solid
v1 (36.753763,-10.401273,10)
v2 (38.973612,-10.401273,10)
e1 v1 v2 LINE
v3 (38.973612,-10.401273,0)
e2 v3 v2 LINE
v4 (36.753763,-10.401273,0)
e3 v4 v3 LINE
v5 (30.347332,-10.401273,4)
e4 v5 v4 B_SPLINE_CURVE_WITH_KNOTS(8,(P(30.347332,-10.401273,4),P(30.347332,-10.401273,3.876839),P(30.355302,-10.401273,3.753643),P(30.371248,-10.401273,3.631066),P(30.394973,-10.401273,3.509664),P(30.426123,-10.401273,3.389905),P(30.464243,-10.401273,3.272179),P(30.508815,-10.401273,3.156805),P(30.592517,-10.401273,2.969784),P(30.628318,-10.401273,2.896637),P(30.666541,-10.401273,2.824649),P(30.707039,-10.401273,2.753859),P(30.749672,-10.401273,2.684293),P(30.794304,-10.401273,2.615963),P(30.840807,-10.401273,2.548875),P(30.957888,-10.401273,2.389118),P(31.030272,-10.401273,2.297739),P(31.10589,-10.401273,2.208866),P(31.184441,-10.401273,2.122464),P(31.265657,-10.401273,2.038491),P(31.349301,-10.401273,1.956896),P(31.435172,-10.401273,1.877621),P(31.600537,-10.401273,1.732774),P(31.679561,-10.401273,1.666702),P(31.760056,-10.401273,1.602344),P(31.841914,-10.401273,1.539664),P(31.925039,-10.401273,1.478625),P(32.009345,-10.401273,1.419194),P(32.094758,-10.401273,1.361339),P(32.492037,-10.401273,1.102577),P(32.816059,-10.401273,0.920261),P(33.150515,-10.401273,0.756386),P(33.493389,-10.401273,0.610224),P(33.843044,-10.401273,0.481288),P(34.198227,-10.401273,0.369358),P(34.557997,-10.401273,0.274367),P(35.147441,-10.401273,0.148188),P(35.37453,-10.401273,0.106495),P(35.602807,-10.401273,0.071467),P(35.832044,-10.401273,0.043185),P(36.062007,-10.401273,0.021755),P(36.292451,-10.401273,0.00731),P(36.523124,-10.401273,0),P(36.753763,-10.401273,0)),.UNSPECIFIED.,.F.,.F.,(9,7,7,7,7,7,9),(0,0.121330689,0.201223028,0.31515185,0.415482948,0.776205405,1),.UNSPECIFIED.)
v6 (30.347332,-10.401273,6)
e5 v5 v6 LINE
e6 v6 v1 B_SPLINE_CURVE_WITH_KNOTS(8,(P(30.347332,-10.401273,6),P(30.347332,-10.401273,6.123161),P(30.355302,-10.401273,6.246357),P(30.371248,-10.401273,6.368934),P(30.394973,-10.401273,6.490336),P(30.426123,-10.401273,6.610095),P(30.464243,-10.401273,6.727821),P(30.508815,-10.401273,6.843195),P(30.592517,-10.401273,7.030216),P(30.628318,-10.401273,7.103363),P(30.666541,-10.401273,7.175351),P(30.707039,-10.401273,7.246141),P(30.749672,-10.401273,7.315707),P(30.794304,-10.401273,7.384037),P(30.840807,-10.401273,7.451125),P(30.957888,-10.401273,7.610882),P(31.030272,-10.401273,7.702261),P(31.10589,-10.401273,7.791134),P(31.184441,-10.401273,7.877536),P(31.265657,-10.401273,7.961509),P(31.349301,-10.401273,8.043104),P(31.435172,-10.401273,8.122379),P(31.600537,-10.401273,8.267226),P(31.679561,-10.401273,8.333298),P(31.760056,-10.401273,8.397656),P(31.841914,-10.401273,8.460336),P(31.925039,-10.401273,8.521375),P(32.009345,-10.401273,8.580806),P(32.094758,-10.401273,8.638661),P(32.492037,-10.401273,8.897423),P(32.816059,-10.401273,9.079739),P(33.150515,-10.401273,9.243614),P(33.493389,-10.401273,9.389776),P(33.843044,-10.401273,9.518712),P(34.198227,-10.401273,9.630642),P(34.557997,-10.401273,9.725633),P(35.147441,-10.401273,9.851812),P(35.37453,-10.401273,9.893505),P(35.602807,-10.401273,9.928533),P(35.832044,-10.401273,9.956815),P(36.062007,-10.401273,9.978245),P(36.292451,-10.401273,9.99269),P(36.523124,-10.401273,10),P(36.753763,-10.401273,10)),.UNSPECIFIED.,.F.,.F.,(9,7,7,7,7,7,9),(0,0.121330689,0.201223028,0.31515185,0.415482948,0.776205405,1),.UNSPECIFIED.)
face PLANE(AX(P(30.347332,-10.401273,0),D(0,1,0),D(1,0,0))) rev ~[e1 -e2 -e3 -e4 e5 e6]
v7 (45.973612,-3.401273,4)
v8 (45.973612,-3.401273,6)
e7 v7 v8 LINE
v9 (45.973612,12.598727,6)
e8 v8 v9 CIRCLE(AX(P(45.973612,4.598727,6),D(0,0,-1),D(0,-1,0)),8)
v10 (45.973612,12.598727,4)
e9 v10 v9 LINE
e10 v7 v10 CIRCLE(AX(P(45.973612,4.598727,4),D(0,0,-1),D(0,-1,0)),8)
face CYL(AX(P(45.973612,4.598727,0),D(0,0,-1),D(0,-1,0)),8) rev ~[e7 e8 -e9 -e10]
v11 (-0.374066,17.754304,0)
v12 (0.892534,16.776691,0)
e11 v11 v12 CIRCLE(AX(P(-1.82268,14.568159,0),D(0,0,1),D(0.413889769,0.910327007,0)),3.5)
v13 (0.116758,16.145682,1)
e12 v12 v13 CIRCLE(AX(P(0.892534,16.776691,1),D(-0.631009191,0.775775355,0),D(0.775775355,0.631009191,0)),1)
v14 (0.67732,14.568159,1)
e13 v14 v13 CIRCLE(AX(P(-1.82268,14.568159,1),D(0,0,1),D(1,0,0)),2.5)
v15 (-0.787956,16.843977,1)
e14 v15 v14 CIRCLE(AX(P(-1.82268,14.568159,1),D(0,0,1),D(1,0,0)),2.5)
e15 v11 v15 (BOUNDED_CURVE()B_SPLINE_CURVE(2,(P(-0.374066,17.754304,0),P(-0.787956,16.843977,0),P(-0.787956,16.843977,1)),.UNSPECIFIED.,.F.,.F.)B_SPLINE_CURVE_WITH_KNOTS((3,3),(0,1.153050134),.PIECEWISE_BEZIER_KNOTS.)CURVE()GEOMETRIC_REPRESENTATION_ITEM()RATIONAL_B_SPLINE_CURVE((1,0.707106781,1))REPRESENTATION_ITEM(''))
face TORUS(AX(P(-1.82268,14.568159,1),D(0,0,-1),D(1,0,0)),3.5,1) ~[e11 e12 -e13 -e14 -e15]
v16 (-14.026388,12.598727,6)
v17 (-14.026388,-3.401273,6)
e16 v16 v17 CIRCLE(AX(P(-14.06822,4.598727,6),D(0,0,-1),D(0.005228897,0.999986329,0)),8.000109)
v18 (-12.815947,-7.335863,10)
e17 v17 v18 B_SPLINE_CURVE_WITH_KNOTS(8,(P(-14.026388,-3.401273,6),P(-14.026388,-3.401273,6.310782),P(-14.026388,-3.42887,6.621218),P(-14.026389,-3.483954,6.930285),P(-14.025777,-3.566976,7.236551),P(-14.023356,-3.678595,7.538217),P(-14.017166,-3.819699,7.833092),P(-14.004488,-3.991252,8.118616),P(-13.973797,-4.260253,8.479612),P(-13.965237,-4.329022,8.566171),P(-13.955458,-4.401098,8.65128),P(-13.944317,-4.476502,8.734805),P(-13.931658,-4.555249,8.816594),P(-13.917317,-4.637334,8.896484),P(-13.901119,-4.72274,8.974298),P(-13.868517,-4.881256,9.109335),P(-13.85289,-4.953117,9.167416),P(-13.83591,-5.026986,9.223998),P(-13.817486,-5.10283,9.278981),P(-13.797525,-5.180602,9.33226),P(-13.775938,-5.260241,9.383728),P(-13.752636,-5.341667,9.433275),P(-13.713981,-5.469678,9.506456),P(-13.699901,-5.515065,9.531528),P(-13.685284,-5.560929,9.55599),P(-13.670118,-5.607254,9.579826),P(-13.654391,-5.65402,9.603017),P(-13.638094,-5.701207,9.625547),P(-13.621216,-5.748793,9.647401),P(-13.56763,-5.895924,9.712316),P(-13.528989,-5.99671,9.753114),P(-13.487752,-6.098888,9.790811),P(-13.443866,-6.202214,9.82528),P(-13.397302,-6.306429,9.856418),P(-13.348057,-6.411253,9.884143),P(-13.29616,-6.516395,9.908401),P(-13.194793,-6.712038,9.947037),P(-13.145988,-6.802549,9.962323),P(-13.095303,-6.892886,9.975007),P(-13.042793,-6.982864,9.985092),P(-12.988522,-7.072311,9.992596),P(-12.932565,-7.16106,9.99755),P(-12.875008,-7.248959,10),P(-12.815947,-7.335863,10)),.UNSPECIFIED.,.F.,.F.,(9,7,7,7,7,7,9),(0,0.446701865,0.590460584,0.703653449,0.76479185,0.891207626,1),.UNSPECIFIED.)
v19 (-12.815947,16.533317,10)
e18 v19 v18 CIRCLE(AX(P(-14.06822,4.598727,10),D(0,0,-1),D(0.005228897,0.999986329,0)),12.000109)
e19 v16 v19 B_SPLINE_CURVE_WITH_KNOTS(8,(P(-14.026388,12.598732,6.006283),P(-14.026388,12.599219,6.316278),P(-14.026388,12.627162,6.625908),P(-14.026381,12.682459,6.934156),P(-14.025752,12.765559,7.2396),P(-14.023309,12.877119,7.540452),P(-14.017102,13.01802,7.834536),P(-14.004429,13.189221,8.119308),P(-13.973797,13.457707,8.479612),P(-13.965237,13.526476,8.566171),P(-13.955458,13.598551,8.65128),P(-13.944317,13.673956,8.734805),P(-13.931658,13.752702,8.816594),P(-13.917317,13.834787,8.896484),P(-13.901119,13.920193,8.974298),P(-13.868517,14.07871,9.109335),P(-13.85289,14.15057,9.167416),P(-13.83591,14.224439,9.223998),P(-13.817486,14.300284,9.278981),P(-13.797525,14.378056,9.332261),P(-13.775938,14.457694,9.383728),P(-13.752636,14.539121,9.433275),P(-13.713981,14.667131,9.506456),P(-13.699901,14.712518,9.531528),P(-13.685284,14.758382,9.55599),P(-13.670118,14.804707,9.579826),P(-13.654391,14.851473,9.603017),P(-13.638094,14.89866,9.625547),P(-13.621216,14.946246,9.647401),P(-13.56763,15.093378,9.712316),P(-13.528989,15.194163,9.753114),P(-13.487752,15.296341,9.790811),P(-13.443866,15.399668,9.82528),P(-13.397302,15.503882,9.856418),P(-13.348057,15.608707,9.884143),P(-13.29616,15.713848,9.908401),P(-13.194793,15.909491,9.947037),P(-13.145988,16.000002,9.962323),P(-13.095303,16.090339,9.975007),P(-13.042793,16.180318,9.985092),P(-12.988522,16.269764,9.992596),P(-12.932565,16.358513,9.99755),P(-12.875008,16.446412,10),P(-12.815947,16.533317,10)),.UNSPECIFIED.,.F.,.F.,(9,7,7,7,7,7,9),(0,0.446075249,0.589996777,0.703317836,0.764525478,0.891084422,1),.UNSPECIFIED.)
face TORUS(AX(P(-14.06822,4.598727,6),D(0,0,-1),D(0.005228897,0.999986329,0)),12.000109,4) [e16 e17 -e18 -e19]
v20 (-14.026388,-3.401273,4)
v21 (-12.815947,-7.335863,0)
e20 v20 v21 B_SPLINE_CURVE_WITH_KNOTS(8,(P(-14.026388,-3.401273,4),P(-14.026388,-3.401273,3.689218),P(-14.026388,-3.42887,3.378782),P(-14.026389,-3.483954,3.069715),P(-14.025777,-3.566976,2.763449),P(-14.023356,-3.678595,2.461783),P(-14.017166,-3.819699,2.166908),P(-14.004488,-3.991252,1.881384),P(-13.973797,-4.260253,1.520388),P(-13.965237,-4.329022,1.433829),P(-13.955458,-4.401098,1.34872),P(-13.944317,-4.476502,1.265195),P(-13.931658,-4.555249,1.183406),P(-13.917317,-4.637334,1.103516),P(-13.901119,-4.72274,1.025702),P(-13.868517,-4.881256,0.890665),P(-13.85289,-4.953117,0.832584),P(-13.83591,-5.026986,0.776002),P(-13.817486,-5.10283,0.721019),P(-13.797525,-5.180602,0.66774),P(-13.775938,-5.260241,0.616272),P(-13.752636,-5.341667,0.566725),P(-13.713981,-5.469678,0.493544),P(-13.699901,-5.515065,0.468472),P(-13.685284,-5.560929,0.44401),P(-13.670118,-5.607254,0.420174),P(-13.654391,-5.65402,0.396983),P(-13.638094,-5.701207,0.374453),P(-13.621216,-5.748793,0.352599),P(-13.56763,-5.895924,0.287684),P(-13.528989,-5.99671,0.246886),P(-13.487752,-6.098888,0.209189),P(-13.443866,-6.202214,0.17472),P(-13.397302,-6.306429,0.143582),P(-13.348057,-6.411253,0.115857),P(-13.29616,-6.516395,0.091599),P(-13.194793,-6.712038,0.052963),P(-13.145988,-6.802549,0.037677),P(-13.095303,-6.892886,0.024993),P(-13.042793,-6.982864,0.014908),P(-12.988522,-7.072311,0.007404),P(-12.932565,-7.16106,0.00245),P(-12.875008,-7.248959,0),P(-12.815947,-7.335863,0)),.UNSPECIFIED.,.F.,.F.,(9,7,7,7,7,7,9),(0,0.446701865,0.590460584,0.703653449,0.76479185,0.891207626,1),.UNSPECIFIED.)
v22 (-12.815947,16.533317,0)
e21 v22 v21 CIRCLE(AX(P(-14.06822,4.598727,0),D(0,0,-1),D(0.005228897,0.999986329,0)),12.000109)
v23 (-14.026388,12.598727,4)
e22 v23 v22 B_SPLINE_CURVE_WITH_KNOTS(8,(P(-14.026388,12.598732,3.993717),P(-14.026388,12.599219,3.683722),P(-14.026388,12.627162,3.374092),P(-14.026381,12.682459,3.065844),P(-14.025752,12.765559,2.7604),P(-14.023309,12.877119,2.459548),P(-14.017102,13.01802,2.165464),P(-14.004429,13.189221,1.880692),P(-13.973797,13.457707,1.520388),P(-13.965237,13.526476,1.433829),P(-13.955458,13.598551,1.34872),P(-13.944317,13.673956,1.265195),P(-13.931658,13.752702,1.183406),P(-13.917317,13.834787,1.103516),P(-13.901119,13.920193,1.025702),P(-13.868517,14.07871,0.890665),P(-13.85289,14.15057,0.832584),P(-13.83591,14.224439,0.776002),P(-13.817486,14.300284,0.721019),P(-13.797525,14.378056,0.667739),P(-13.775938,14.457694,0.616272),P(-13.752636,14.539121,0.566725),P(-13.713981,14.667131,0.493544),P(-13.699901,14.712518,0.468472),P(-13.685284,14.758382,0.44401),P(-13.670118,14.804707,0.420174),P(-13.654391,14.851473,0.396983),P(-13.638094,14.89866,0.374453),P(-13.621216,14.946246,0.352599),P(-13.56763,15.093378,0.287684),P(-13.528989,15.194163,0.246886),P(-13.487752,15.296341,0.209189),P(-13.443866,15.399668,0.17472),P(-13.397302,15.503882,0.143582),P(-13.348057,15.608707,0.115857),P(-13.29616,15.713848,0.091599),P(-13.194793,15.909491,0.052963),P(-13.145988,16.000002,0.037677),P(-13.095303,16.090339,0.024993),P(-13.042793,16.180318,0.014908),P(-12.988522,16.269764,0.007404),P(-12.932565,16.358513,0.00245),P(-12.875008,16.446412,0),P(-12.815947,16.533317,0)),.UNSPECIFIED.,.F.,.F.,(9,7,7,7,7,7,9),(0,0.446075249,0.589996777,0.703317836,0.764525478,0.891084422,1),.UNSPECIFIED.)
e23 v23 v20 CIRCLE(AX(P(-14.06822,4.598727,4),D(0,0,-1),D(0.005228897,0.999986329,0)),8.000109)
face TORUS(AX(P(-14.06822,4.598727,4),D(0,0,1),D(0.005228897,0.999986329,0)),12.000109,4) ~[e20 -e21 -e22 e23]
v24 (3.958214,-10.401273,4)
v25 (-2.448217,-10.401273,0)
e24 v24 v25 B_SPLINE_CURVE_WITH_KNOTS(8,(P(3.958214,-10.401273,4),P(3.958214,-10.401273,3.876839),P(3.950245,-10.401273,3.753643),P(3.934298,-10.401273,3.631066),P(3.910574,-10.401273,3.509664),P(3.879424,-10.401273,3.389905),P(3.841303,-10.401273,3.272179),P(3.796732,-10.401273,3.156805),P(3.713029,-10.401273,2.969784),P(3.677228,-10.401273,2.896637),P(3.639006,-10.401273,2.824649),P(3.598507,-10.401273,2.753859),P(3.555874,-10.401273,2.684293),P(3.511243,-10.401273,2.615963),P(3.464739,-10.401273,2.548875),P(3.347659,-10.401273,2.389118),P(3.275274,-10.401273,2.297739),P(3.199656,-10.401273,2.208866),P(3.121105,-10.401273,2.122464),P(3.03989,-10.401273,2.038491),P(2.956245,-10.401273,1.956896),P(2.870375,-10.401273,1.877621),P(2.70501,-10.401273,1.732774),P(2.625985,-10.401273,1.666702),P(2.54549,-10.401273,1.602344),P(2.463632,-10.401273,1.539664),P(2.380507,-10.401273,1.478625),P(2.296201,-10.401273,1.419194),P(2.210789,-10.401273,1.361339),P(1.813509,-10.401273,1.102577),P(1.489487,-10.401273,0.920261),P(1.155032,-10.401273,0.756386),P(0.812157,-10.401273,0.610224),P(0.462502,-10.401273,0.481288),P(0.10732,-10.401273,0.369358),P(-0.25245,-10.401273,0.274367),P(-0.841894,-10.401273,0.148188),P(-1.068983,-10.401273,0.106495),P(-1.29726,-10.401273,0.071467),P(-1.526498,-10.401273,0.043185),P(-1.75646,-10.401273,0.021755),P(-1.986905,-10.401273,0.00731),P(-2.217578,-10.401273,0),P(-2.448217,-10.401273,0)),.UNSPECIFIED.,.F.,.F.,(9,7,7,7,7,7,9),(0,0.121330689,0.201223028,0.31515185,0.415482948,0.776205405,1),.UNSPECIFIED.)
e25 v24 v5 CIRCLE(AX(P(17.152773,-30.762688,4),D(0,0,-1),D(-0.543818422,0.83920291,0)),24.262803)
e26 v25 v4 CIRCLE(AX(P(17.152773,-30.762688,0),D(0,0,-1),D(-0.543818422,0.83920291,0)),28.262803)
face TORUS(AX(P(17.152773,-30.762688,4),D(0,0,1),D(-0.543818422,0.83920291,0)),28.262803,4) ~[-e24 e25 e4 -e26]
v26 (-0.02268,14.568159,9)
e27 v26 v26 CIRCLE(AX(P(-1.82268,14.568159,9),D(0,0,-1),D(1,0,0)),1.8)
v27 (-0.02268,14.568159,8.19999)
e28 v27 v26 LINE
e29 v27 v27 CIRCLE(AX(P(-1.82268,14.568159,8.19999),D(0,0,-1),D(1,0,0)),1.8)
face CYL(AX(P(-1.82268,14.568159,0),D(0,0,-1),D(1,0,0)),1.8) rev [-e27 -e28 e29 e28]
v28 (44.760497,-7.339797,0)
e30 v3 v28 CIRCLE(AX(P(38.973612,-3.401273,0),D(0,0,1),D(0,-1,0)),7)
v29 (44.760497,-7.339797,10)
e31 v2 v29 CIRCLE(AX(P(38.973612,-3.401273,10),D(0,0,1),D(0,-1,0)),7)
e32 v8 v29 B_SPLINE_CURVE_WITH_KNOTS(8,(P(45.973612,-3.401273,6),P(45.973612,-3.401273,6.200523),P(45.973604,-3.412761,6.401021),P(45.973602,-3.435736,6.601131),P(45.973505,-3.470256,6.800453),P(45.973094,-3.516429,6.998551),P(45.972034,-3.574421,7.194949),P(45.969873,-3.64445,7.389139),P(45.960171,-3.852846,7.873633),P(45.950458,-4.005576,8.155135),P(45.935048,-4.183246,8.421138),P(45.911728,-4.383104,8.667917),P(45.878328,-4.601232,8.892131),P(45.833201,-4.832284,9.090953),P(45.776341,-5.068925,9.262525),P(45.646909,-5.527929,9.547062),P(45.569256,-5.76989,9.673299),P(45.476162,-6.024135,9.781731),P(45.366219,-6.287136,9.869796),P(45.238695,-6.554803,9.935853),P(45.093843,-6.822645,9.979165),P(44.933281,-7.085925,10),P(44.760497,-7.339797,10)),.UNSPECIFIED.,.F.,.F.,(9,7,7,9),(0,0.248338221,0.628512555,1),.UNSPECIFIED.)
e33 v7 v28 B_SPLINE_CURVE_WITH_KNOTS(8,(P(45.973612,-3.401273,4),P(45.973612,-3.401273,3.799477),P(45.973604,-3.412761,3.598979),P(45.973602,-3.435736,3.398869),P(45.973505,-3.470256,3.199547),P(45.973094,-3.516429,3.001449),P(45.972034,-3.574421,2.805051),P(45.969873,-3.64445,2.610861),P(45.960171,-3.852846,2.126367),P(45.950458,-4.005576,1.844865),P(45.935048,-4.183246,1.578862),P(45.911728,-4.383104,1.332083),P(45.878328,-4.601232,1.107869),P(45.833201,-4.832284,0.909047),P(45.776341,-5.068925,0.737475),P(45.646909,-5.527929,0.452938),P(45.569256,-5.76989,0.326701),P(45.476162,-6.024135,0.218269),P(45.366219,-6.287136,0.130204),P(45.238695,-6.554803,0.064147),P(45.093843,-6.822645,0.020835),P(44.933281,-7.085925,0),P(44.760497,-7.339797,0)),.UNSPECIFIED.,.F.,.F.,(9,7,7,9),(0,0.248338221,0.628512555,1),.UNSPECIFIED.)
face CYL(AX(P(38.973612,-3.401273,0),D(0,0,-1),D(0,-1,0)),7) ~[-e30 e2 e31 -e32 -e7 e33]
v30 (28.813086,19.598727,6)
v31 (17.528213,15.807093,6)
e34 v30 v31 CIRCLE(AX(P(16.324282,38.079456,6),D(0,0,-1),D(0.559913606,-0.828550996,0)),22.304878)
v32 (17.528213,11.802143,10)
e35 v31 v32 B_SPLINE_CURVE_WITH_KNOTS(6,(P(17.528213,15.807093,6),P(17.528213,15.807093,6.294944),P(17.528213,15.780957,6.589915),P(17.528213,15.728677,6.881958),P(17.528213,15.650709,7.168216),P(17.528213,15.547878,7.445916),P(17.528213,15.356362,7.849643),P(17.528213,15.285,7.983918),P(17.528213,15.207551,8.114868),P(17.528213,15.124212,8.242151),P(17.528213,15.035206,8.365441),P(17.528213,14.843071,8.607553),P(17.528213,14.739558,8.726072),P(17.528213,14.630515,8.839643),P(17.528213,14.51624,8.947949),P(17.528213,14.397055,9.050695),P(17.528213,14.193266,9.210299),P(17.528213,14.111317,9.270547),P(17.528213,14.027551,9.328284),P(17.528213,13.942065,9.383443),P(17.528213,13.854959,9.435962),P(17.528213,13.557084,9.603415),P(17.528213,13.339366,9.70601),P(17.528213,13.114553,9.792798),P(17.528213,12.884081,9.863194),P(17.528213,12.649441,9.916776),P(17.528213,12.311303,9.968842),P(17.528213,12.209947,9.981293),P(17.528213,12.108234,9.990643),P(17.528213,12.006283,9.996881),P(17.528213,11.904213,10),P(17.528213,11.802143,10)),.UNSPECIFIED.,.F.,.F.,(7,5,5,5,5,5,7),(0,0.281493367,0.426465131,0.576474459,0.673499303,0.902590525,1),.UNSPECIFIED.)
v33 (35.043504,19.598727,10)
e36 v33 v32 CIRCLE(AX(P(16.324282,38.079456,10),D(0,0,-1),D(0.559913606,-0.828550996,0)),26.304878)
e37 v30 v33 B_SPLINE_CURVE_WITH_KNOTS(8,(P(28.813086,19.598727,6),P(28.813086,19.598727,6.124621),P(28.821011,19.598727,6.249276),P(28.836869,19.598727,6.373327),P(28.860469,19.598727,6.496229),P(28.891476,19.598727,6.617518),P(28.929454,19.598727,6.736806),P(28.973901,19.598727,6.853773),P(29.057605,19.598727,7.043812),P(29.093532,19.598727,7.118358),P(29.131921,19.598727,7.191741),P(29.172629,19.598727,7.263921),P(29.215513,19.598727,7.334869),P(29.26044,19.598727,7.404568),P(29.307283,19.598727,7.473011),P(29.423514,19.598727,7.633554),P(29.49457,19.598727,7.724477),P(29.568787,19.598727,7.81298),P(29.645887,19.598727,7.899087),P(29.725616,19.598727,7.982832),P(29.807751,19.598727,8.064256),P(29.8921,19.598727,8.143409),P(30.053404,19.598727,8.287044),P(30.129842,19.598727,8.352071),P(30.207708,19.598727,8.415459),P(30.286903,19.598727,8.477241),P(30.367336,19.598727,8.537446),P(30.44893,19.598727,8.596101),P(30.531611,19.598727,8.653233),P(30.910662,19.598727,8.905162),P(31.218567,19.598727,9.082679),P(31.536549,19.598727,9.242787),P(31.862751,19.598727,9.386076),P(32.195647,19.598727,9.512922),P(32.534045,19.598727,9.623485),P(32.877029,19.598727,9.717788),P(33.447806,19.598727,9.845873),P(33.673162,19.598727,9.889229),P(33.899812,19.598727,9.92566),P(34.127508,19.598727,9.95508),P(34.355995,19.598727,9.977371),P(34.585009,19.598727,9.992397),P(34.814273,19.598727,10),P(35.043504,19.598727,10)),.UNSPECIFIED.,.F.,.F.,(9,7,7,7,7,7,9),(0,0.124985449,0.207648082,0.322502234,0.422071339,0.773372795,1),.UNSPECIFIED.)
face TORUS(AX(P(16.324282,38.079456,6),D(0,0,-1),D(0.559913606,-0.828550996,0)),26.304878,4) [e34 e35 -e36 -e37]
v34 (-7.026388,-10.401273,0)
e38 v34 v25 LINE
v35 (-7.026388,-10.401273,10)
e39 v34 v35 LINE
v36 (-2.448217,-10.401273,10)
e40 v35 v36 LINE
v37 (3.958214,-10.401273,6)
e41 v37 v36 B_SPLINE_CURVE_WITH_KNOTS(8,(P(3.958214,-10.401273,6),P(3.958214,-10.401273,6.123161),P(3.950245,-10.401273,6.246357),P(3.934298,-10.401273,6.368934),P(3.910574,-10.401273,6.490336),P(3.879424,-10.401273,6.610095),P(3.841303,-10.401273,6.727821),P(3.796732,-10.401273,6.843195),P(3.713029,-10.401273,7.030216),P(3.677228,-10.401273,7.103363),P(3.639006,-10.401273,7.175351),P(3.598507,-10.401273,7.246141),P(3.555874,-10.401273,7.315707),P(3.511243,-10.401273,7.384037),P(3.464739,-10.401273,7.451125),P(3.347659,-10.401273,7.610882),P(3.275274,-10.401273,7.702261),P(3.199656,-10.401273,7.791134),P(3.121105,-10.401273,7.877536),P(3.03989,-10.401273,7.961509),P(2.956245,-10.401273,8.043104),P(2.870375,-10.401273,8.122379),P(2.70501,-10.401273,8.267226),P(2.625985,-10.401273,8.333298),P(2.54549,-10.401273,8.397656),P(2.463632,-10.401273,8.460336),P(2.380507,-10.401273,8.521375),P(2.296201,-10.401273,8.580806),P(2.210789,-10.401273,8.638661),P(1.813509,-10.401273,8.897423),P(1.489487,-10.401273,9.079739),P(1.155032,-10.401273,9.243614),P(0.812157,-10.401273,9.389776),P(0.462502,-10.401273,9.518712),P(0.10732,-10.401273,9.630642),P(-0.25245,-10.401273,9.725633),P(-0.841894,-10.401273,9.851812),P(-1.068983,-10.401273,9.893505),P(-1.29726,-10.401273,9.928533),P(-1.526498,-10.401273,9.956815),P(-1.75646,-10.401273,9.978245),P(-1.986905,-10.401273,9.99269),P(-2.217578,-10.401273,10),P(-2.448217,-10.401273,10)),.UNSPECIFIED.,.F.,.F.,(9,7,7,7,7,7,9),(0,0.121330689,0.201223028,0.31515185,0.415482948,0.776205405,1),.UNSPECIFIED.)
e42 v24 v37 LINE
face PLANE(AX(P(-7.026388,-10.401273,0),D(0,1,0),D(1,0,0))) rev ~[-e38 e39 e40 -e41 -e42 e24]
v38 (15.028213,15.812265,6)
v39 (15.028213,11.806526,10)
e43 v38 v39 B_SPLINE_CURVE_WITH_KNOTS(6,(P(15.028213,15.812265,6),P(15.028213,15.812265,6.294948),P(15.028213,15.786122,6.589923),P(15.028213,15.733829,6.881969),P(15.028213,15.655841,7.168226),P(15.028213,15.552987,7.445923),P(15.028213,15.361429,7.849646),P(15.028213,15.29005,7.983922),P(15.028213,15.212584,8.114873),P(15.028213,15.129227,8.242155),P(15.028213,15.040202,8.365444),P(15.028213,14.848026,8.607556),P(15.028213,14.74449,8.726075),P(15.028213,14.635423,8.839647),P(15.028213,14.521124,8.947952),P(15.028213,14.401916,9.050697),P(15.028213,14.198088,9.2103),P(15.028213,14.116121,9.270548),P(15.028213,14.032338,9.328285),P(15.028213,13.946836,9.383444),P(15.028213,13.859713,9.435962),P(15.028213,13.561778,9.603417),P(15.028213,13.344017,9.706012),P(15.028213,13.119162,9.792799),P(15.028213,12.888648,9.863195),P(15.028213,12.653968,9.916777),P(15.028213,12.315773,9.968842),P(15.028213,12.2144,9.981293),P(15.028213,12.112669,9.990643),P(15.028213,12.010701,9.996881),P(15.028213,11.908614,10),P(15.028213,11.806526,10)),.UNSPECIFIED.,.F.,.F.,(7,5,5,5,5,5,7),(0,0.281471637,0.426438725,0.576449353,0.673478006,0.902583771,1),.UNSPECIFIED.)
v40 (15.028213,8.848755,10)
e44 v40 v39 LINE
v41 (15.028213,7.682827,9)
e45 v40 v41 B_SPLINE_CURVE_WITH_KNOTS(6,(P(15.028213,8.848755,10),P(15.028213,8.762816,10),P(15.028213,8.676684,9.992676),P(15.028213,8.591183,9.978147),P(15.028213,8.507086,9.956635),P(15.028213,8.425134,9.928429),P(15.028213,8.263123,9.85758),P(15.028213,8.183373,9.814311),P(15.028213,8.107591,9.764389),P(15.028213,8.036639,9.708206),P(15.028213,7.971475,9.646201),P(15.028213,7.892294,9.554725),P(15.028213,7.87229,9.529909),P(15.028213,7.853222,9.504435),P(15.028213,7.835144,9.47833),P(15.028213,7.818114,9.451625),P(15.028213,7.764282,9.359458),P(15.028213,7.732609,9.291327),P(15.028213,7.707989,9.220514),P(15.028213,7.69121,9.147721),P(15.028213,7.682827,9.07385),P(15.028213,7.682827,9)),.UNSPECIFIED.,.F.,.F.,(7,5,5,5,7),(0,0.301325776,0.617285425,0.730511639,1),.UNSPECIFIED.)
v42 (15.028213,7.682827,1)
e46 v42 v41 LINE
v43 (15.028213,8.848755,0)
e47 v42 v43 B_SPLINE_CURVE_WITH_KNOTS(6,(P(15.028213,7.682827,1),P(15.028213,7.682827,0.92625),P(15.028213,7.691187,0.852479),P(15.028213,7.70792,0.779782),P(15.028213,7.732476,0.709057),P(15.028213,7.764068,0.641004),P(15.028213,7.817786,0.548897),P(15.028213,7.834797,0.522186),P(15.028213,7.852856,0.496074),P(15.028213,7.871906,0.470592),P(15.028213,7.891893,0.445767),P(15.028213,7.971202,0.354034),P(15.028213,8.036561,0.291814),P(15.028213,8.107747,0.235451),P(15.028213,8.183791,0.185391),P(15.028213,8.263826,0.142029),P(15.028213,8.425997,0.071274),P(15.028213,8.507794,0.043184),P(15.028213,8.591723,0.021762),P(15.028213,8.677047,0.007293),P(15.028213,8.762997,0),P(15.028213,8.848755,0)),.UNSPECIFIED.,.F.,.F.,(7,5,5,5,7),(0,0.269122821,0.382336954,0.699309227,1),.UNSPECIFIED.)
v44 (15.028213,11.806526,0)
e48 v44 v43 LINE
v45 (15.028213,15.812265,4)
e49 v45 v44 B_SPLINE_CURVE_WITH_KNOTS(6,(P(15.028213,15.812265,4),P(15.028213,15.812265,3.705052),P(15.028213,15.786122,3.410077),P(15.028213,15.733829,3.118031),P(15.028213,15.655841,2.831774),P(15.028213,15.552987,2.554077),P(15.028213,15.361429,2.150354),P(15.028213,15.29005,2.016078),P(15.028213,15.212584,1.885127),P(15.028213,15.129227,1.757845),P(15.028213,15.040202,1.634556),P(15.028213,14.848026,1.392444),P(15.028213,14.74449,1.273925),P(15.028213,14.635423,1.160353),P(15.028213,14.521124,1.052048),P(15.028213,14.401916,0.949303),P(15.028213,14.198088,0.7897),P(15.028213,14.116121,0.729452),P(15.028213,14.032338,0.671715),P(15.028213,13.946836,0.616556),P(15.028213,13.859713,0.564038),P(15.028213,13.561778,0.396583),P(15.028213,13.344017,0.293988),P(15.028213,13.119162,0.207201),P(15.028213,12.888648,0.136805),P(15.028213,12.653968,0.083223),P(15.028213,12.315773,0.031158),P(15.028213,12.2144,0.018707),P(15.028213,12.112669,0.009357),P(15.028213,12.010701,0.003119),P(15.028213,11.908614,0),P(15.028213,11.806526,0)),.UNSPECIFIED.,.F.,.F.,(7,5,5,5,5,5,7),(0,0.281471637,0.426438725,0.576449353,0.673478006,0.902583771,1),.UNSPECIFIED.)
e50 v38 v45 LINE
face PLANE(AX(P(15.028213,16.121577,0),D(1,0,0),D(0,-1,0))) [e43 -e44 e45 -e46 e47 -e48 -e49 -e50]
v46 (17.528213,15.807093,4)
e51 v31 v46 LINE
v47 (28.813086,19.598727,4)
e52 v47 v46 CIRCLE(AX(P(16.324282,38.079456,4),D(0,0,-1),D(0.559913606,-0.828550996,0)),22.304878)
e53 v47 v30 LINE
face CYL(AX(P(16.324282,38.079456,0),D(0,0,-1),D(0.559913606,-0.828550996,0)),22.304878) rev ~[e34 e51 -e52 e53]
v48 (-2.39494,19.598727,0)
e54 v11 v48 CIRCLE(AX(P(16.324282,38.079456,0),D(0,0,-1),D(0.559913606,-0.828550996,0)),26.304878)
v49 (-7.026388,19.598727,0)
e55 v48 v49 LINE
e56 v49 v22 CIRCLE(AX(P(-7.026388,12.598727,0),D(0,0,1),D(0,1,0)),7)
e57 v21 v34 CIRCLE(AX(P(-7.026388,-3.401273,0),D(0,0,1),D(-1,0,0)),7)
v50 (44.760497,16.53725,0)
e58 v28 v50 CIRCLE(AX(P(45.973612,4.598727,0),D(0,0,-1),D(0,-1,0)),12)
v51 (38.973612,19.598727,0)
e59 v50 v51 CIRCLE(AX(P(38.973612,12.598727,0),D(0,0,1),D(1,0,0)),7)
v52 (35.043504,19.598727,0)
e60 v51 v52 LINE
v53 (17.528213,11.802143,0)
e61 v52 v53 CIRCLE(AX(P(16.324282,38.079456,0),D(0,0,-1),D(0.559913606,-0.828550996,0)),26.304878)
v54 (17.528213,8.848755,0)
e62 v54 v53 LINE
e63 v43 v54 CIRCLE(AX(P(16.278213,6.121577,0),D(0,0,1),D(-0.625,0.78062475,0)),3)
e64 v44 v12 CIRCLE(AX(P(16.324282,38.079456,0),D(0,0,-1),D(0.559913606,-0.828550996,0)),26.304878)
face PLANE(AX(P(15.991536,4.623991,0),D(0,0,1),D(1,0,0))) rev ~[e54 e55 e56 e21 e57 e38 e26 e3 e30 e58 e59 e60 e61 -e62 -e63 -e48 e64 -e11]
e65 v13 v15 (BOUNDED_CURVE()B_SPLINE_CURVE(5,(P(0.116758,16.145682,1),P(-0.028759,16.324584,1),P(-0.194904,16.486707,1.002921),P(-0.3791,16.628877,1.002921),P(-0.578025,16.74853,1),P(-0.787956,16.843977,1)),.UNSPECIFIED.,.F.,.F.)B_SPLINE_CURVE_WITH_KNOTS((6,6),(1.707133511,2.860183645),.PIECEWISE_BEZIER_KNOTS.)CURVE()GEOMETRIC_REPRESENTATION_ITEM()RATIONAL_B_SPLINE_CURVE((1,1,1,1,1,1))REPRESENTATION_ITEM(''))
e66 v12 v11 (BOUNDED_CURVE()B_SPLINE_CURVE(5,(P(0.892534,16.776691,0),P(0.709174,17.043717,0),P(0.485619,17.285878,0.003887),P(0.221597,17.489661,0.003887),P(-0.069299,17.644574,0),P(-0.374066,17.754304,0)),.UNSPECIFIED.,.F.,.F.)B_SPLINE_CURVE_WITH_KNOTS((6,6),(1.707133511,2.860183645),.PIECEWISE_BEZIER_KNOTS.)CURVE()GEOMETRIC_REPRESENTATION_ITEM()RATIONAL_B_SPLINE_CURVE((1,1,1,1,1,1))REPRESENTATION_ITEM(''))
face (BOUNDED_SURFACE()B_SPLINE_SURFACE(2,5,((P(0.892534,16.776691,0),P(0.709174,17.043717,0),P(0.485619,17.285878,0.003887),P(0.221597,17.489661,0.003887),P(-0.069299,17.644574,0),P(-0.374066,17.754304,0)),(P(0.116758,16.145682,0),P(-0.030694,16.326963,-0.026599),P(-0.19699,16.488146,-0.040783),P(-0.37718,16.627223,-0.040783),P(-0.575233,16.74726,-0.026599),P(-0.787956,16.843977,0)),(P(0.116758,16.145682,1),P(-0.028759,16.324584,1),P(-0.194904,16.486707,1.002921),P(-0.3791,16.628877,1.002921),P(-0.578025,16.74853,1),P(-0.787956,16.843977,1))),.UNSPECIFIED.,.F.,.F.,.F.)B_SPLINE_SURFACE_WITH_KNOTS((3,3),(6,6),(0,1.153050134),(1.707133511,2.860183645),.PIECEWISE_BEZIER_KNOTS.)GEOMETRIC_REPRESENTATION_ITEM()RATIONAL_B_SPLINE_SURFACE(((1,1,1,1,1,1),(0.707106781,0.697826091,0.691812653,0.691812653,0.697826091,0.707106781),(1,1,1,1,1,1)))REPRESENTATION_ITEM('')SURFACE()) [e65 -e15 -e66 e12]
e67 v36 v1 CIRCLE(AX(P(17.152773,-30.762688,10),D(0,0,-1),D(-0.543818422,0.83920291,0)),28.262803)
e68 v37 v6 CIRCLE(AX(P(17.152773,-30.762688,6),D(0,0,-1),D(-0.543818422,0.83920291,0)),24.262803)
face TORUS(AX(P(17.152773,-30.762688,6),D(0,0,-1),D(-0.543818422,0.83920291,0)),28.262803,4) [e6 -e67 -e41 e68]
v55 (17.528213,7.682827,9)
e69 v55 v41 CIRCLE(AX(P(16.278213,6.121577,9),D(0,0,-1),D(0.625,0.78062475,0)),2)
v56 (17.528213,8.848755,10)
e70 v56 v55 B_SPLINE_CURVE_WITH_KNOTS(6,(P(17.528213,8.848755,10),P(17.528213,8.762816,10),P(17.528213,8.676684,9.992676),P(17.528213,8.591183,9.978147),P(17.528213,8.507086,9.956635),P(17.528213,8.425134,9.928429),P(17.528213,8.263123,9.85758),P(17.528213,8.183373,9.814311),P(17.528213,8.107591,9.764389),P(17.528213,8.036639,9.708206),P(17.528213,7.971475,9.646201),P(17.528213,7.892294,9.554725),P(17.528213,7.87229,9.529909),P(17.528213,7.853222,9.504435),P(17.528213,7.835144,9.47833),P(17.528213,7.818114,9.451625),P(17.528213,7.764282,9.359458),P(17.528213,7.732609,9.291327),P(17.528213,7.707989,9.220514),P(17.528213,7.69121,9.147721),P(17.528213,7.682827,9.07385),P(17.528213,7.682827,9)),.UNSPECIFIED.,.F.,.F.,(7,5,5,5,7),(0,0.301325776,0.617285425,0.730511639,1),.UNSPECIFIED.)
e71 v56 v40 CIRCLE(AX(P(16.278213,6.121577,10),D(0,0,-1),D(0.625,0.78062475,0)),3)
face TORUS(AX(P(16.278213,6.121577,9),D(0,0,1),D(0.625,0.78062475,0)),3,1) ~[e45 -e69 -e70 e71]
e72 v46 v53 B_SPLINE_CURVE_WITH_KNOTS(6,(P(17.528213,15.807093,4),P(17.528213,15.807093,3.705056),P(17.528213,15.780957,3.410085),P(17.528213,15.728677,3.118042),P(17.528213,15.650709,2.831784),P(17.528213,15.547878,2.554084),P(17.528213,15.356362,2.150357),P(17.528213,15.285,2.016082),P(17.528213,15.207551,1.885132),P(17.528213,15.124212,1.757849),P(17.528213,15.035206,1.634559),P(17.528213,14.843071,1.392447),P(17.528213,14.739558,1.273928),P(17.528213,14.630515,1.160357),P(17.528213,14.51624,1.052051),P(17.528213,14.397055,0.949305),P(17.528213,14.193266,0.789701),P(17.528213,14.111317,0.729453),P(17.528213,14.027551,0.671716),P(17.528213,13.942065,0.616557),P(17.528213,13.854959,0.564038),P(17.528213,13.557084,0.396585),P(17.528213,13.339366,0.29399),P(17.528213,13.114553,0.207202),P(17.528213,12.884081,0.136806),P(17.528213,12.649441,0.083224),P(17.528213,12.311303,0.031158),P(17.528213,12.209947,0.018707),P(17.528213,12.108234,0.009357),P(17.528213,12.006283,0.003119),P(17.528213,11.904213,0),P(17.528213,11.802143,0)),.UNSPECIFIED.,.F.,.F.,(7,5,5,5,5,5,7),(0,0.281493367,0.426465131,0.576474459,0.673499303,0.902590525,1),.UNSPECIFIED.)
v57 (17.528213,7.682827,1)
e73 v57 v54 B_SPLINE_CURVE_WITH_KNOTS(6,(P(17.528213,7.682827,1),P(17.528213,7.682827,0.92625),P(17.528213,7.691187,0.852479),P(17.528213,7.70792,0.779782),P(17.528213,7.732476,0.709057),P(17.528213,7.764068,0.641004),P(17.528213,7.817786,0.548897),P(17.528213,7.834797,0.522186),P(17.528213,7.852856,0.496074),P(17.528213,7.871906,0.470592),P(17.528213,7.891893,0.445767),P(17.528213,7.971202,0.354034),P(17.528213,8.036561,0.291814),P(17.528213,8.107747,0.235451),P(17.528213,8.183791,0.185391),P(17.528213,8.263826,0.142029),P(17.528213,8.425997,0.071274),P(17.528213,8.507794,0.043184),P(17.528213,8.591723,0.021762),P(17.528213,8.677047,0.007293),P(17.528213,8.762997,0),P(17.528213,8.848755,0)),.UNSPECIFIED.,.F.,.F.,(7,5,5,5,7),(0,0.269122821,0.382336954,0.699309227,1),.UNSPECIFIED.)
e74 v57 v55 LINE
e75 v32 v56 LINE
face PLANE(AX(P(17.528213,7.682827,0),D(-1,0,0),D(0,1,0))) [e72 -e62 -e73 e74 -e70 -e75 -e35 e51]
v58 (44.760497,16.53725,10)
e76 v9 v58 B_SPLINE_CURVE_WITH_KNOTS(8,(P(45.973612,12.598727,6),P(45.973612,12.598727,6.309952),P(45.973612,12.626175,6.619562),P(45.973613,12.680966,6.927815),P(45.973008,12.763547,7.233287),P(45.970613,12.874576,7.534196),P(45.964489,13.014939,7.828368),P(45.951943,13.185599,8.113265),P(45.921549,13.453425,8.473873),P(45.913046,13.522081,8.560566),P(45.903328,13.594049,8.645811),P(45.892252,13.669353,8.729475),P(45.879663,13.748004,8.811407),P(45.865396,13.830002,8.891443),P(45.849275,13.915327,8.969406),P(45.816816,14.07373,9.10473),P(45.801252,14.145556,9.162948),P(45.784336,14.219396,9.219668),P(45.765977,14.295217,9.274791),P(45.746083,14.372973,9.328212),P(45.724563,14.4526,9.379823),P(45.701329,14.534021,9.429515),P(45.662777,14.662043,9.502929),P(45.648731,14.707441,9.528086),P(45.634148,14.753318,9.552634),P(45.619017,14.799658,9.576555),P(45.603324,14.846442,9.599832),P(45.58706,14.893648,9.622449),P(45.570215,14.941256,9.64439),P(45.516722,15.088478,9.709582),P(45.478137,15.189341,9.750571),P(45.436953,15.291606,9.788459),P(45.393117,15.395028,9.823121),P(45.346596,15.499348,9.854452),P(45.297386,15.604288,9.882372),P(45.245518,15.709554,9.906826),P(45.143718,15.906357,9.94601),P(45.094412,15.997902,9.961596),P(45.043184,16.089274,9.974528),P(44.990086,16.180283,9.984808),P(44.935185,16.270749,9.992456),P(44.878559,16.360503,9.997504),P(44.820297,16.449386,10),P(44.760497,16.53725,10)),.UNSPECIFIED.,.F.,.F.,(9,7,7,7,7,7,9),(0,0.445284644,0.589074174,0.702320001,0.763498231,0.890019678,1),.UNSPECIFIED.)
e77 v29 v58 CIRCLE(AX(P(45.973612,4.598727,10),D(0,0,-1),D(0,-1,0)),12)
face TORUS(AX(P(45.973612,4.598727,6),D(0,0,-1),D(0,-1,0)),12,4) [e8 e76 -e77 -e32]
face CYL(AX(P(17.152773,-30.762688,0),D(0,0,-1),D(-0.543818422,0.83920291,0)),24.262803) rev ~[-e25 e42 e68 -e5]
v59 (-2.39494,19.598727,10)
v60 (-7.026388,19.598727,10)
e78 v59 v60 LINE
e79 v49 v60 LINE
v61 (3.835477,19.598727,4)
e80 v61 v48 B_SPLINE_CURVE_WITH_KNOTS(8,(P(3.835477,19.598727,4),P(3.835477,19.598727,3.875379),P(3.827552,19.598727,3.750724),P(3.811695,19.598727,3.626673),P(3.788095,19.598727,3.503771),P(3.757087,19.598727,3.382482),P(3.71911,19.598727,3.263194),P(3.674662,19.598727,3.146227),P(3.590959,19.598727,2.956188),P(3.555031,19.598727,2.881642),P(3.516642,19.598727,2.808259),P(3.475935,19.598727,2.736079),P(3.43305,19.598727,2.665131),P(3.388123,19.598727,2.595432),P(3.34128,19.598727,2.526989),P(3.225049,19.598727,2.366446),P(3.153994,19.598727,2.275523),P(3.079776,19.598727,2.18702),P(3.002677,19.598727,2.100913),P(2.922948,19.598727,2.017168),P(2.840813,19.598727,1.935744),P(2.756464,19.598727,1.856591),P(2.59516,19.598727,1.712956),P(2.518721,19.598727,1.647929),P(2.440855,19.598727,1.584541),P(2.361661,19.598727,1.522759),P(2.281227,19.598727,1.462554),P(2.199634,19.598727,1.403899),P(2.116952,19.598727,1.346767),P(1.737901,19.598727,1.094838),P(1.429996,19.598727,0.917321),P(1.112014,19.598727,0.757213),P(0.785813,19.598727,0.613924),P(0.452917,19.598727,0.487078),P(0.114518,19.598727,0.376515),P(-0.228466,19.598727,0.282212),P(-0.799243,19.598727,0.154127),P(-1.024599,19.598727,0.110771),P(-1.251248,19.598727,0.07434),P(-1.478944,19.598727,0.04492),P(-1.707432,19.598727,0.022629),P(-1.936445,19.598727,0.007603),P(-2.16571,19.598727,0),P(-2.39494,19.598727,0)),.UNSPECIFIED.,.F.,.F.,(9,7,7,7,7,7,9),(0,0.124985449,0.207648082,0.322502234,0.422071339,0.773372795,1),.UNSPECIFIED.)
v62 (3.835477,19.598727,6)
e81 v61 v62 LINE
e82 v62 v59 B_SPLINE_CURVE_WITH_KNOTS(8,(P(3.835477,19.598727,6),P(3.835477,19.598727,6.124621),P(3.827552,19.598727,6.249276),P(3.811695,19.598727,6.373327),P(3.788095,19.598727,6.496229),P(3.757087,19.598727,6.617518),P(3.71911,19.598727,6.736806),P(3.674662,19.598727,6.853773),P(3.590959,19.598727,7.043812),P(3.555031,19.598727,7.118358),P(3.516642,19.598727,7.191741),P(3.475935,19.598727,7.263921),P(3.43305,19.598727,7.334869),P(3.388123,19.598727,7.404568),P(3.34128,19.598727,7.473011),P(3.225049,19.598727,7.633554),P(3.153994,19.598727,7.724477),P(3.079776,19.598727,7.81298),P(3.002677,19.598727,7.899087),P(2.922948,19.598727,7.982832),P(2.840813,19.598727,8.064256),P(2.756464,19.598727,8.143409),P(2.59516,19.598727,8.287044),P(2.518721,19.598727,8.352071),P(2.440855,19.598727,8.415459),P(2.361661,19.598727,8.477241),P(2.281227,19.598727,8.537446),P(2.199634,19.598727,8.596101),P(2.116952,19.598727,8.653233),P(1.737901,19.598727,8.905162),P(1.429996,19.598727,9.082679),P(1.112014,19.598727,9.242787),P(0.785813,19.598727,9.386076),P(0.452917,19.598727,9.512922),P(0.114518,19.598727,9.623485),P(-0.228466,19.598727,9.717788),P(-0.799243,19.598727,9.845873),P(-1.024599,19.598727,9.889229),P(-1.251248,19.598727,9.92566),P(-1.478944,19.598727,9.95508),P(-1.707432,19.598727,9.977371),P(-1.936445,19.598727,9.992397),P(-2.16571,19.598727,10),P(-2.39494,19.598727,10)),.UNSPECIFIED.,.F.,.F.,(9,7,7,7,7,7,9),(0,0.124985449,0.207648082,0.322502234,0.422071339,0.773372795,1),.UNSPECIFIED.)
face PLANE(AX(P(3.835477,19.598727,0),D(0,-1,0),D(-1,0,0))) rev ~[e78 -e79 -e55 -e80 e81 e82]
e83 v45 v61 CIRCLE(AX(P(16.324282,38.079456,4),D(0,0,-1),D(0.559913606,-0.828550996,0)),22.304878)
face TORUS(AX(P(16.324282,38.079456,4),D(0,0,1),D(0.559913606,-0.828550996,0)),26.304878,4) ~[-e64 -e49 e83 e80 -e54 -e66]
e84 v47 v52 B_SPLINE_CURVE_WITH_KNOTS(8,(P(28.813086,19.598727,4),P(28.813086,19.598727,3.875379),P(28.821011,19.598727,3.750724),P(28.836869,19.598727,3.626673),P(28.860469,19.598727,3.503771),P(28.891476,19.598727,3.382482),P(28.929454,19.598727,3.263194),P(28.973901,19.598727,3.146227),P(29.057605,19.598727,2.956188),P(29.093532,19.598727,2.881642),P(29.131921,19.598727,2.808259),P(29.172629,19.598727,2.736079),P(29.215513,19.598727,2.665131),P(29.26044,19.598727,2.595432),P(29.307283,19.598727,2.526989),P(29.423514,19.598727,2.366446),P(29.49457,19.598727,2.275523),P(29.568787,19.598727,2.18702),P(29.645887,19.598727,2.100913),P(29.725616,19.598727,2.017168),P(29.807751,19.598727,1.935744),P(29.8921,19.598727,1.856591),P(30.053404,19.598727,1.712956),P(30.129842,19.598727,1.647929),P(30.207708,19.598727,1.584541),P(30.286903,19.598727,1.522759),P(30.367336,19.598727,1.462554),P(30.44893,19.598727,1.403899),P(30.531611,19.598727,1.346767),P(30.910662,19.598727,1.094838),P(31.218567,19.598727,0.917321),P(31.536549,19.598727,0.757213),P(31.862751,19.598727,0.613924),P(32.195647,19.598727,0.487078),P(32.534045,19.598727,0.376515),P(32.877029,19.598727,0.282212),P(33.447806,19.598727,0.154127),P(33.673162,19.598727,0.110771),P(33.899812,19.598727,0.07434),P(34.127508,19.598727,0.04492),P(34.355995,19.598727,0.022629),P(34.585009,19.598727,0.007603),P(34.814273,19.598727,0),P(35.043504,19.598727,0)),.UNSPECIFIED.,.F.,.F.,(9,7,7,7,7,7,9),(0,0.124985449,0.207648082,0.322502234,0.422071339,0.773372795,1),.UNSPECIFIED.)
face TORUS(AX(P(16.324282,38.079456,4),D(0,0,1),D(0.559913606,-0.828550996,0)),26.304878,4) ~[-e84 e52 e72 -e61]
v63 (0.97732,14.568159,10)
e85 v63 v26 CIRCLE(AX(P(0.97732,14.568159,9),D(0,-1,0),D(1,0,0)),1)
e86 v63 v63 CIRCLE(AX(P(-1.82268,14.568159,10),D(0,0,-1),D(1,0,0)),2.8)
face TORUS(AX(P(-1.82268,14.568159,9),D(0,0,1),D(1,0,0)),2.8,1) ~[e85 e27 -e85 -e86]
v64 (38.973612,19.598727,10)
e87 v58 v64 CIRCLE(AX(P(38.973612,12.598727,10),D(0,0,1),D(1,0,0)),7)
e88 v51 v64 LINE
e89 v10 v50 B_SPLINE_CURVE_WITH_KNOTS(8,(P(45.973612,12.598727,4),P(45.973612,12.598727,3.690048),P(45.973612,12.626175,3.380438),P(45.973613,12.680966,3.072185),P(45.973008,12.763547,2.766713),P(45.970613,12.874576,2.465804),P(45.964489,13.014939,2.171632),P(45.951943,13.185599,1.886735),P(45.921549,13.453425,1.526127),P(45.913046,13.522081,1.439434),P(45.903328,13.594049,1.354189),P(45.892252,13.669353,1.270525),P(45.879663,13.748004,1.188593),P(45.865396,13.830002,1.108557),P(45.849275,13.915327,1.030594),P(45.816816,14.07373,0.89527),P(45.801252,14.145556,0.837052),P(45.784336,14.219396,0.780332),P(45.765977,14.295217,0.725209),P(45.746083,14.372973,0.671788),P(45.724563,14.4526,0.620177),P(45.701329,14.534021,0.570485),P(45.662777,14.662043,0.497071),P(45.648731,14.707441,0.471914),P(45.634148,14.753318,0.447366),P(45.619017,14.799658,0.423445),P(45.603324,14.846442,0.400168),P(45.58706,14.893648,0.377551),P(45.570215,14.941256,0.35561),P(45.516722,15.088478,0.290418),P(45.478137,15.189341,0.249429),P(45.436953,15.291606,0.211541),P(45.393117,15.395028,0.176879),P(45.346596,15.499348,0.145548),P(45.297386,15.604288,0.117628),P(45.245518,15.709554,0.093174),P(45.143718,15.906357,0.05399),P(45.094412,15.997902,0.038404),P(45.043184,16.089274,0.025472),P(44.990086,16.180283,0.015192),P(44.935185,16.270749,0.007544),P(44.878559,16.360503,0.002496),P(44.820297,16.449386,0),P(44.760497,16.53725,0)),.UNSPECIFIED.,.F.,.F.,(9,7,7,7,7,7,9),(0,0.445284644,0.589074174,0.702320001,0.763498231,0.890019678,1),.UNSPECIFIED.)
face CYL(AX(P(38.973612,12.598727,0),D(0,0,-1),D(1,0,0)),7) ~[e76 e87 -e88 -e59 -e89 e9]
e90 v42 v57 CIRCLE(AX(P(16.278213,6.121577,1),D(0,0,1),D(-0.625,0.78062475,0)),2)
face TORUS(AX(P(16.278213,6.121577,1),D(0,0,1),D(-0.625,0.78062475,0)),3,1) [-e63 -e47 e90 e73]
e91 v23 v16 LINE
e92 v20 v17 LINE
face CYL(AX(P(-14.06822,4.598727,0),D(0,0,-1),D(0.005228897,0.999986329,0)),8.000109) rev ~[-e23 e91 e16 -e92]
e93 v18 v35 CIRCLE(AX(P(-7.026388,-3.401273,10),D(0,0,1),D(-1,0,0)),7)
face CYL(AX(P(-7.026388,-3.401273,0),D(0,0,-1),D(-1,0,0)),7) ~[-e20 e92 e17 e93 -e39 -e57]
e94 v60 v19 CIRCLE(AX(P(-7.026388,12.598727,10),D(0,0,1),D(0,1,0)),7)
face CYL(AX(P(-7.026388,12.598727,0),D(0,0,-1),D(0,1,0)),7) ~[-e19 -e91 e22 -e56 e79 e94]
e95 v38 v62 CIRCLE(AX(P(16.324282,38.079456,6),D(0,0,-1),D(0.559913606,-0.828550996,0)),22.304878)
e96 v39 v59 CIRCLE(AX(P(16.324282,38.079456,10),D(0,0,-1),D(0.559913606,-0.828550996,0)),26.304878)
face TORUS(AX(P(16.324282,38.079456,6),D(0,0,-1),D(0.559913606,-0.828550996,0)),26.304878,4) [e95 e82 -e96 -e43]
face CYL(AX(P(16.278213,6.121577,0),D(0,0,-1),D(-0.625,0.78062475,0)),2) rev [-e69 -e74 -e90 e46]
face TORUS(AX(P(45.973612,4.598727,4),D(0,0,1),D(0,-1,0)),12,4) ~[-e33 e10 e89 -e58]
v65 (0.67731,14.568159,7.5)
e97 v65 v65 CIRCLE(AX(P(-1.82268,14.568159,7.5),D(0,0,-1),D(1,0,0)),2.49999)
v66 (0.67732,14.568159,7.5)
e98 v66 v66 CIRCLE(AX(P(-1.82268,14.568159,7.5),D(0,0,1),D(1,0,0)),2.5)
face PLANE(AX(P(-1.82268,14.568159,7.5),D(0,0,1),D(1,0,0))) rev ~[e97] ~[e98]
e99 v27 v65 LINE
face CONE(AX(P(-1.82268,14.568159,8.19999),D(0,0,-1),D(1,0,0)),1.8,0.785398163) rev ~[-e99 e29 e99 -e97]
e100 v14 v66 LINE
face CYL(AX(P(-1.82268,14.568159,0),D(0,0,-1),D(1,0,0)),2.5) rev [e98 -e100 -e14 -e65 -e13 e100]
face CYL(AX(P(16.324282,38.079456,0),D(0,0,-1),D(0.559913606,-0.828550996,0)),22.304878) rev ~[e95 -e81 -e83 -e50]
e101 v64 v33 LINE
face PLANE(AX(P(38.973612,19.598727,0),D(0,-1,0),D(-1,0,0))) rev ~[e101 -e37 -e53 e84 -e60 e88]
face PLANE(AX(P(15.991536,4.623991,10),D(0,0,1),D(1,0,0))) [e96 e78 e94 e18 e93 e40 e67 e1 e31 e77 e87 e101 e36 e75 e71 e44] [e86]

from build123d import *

# Parameters (mm, degrees)
F1_DEPTH  = 10
F2_R      = 4
F3_R      = 2.5
F4_DEPTH  = 7.5
F5_R      = 1.8
F6_DEPTH  = 29.012279585
F7_R      = 1
F8_SIZE   = 0.69999
F10_DEPTH = 25
F11_R     = 1


# Not quite as in the source:
# - a fillet or chamfer is up to 0.001 mm smaller than in the source, because OpenCascade refuses the exact size


with BuildPart() as f1:
    # F0 (on Top) → F1 (new body)
    with BuildSketch(Plane.XY):
        with BuildLine():
            Line((3.8354769349, 19.5987266302), (-7.0263877602, 19.5987266302))
            ThreePointArc((-7.0263877602, 19.5987266302), (-11.9761352285, 17.5484740985), (-14.0263877602, 12.5987266302))
            ThreePointArc((-14.0263877602, 12.5987266302), (-6.0681101368, 4.5987266302), (-14.0263877602, -3.4012733698))
            ThreePointArc((-14.0263877602, -3.4012733698), (-11.9761352285, -8.3510208381), (-7.0263877602, -10.4012733698))
            Line((-7.0263877602, -10.4012733698), (3.9582140744, -10.4012733698))
            ThreePointArc((3.9582140744, -10.4012733698), (17.1527732164, -6.4998852769), (30.3473323584, -10.4012733698))
            Line((30.3473323584, -10.4012733698), (38.9736122398, -10.4012733698))
            ThreePointArc((38.9736122398, -10.4012733698), (43.9233597081, -8.3510208381), (45.9736122398, -3.4012733698))
            ThreePointArc((45.9736122398, -3.4012733698), (37.9736122398, 4.5987266302), (45.9736122398, 12.5987266302))
            ThreePointArc((45.9736122398, 12.5987266302), (43.9233597081, 17.5484740985), (38.9736122398, 19.5987266302))
            Line((38.9736122398, 19.5987266302), (28.8130864501, 19.5987266302))
            ThreePointArc((28.8130864501, 19.5987266302), (16.3242816925, 15.7745774939), (3.8354769349, 19.5987266302))
        make_face()
    extrude(amount=F1_DEPTH)

    # F2
    f2_edges = [f1.edges().sort_by_distance(p)[0] for p in [
        (17.152773, -6.499885, 10),
        (-6.06811, 4.598727, 10),
        (16.324282, 15.774577, 10),
        (37.973612, 4.598727, 10),
        (-6.06811, 4.598727, 0),
        (17.152773, -6.499885, 0),
        (16.324282, 15.774577, 0),
        (37.973612, 4.598727, 0),
    ]]
    fillet(f2_edges, radius=F2_R)

    # F3 (on Top) → F4 (cut)
    with BuildSketch(Plane.XY):
        with Locations((-1.8226802303, 14.5681592802)):
            Circle(F3_R)
    extrude(amount=F4_DEPTH, mode=Mode.SUBTRACT)

    # F5 (on Top) → F6 (cut)
    with BuildSketch(Plane.XY):
        with Locations((-1.8226802303, 14.5681592802)):
            Circle(F5_R)
    extrude(amount=F6_DEPTH, mode=Mode.SUBTRACT)

    # F7
    f7_edges = [f1.edges().sort_by_distance(p)[0] for p in [
        (-4.32268, 14.568159, 0),
        (-3.62268, 14.568159, 10),
    ]]
    fillet(f7_edges, radius=F7_R)

    # F8 (size 0.7 in the source; OpenCascade refuses exactly that, so slightly less here)
    f8_edges = [f1.edges().sort_by_distance(p)[0] for p in [
        (-3.62268, 14.568159, 7.5),
    ]]
    chamfer(f8_edges, length=F8_SIZE)

    # F9 (on Top) → F10 (cut)
    with BuildSketch(Plane.XY):
        with BuildLine():
            Line((17.52821289, 16.1215772422), (15.02821289, 16.1215772422))
            Line((15.02821289, 16.1215772422), (15.02821289, 7.6828267418))
            ThreePointArc((15.02821289, 7.6828267418), (16.27821289, 4.1215772422), (17.52821289, 7.6828267418))
            Line((17.52821289, 7.6828267418), (17.52821289, 16.1215772422))
        make_face()
    extrude(amount=F10_DEPTH, mode=Mode.SUBTRACT)

    # F11
    f11_edges = [f1.edges().sort_by_distance(p)[0] for p in [
        (16.278213, 4.121577, 10),
        (16.278213, 4.121577, 0),
    ]]
    fillet(f11_edges, radius=F11_R)


solid = f1.part
